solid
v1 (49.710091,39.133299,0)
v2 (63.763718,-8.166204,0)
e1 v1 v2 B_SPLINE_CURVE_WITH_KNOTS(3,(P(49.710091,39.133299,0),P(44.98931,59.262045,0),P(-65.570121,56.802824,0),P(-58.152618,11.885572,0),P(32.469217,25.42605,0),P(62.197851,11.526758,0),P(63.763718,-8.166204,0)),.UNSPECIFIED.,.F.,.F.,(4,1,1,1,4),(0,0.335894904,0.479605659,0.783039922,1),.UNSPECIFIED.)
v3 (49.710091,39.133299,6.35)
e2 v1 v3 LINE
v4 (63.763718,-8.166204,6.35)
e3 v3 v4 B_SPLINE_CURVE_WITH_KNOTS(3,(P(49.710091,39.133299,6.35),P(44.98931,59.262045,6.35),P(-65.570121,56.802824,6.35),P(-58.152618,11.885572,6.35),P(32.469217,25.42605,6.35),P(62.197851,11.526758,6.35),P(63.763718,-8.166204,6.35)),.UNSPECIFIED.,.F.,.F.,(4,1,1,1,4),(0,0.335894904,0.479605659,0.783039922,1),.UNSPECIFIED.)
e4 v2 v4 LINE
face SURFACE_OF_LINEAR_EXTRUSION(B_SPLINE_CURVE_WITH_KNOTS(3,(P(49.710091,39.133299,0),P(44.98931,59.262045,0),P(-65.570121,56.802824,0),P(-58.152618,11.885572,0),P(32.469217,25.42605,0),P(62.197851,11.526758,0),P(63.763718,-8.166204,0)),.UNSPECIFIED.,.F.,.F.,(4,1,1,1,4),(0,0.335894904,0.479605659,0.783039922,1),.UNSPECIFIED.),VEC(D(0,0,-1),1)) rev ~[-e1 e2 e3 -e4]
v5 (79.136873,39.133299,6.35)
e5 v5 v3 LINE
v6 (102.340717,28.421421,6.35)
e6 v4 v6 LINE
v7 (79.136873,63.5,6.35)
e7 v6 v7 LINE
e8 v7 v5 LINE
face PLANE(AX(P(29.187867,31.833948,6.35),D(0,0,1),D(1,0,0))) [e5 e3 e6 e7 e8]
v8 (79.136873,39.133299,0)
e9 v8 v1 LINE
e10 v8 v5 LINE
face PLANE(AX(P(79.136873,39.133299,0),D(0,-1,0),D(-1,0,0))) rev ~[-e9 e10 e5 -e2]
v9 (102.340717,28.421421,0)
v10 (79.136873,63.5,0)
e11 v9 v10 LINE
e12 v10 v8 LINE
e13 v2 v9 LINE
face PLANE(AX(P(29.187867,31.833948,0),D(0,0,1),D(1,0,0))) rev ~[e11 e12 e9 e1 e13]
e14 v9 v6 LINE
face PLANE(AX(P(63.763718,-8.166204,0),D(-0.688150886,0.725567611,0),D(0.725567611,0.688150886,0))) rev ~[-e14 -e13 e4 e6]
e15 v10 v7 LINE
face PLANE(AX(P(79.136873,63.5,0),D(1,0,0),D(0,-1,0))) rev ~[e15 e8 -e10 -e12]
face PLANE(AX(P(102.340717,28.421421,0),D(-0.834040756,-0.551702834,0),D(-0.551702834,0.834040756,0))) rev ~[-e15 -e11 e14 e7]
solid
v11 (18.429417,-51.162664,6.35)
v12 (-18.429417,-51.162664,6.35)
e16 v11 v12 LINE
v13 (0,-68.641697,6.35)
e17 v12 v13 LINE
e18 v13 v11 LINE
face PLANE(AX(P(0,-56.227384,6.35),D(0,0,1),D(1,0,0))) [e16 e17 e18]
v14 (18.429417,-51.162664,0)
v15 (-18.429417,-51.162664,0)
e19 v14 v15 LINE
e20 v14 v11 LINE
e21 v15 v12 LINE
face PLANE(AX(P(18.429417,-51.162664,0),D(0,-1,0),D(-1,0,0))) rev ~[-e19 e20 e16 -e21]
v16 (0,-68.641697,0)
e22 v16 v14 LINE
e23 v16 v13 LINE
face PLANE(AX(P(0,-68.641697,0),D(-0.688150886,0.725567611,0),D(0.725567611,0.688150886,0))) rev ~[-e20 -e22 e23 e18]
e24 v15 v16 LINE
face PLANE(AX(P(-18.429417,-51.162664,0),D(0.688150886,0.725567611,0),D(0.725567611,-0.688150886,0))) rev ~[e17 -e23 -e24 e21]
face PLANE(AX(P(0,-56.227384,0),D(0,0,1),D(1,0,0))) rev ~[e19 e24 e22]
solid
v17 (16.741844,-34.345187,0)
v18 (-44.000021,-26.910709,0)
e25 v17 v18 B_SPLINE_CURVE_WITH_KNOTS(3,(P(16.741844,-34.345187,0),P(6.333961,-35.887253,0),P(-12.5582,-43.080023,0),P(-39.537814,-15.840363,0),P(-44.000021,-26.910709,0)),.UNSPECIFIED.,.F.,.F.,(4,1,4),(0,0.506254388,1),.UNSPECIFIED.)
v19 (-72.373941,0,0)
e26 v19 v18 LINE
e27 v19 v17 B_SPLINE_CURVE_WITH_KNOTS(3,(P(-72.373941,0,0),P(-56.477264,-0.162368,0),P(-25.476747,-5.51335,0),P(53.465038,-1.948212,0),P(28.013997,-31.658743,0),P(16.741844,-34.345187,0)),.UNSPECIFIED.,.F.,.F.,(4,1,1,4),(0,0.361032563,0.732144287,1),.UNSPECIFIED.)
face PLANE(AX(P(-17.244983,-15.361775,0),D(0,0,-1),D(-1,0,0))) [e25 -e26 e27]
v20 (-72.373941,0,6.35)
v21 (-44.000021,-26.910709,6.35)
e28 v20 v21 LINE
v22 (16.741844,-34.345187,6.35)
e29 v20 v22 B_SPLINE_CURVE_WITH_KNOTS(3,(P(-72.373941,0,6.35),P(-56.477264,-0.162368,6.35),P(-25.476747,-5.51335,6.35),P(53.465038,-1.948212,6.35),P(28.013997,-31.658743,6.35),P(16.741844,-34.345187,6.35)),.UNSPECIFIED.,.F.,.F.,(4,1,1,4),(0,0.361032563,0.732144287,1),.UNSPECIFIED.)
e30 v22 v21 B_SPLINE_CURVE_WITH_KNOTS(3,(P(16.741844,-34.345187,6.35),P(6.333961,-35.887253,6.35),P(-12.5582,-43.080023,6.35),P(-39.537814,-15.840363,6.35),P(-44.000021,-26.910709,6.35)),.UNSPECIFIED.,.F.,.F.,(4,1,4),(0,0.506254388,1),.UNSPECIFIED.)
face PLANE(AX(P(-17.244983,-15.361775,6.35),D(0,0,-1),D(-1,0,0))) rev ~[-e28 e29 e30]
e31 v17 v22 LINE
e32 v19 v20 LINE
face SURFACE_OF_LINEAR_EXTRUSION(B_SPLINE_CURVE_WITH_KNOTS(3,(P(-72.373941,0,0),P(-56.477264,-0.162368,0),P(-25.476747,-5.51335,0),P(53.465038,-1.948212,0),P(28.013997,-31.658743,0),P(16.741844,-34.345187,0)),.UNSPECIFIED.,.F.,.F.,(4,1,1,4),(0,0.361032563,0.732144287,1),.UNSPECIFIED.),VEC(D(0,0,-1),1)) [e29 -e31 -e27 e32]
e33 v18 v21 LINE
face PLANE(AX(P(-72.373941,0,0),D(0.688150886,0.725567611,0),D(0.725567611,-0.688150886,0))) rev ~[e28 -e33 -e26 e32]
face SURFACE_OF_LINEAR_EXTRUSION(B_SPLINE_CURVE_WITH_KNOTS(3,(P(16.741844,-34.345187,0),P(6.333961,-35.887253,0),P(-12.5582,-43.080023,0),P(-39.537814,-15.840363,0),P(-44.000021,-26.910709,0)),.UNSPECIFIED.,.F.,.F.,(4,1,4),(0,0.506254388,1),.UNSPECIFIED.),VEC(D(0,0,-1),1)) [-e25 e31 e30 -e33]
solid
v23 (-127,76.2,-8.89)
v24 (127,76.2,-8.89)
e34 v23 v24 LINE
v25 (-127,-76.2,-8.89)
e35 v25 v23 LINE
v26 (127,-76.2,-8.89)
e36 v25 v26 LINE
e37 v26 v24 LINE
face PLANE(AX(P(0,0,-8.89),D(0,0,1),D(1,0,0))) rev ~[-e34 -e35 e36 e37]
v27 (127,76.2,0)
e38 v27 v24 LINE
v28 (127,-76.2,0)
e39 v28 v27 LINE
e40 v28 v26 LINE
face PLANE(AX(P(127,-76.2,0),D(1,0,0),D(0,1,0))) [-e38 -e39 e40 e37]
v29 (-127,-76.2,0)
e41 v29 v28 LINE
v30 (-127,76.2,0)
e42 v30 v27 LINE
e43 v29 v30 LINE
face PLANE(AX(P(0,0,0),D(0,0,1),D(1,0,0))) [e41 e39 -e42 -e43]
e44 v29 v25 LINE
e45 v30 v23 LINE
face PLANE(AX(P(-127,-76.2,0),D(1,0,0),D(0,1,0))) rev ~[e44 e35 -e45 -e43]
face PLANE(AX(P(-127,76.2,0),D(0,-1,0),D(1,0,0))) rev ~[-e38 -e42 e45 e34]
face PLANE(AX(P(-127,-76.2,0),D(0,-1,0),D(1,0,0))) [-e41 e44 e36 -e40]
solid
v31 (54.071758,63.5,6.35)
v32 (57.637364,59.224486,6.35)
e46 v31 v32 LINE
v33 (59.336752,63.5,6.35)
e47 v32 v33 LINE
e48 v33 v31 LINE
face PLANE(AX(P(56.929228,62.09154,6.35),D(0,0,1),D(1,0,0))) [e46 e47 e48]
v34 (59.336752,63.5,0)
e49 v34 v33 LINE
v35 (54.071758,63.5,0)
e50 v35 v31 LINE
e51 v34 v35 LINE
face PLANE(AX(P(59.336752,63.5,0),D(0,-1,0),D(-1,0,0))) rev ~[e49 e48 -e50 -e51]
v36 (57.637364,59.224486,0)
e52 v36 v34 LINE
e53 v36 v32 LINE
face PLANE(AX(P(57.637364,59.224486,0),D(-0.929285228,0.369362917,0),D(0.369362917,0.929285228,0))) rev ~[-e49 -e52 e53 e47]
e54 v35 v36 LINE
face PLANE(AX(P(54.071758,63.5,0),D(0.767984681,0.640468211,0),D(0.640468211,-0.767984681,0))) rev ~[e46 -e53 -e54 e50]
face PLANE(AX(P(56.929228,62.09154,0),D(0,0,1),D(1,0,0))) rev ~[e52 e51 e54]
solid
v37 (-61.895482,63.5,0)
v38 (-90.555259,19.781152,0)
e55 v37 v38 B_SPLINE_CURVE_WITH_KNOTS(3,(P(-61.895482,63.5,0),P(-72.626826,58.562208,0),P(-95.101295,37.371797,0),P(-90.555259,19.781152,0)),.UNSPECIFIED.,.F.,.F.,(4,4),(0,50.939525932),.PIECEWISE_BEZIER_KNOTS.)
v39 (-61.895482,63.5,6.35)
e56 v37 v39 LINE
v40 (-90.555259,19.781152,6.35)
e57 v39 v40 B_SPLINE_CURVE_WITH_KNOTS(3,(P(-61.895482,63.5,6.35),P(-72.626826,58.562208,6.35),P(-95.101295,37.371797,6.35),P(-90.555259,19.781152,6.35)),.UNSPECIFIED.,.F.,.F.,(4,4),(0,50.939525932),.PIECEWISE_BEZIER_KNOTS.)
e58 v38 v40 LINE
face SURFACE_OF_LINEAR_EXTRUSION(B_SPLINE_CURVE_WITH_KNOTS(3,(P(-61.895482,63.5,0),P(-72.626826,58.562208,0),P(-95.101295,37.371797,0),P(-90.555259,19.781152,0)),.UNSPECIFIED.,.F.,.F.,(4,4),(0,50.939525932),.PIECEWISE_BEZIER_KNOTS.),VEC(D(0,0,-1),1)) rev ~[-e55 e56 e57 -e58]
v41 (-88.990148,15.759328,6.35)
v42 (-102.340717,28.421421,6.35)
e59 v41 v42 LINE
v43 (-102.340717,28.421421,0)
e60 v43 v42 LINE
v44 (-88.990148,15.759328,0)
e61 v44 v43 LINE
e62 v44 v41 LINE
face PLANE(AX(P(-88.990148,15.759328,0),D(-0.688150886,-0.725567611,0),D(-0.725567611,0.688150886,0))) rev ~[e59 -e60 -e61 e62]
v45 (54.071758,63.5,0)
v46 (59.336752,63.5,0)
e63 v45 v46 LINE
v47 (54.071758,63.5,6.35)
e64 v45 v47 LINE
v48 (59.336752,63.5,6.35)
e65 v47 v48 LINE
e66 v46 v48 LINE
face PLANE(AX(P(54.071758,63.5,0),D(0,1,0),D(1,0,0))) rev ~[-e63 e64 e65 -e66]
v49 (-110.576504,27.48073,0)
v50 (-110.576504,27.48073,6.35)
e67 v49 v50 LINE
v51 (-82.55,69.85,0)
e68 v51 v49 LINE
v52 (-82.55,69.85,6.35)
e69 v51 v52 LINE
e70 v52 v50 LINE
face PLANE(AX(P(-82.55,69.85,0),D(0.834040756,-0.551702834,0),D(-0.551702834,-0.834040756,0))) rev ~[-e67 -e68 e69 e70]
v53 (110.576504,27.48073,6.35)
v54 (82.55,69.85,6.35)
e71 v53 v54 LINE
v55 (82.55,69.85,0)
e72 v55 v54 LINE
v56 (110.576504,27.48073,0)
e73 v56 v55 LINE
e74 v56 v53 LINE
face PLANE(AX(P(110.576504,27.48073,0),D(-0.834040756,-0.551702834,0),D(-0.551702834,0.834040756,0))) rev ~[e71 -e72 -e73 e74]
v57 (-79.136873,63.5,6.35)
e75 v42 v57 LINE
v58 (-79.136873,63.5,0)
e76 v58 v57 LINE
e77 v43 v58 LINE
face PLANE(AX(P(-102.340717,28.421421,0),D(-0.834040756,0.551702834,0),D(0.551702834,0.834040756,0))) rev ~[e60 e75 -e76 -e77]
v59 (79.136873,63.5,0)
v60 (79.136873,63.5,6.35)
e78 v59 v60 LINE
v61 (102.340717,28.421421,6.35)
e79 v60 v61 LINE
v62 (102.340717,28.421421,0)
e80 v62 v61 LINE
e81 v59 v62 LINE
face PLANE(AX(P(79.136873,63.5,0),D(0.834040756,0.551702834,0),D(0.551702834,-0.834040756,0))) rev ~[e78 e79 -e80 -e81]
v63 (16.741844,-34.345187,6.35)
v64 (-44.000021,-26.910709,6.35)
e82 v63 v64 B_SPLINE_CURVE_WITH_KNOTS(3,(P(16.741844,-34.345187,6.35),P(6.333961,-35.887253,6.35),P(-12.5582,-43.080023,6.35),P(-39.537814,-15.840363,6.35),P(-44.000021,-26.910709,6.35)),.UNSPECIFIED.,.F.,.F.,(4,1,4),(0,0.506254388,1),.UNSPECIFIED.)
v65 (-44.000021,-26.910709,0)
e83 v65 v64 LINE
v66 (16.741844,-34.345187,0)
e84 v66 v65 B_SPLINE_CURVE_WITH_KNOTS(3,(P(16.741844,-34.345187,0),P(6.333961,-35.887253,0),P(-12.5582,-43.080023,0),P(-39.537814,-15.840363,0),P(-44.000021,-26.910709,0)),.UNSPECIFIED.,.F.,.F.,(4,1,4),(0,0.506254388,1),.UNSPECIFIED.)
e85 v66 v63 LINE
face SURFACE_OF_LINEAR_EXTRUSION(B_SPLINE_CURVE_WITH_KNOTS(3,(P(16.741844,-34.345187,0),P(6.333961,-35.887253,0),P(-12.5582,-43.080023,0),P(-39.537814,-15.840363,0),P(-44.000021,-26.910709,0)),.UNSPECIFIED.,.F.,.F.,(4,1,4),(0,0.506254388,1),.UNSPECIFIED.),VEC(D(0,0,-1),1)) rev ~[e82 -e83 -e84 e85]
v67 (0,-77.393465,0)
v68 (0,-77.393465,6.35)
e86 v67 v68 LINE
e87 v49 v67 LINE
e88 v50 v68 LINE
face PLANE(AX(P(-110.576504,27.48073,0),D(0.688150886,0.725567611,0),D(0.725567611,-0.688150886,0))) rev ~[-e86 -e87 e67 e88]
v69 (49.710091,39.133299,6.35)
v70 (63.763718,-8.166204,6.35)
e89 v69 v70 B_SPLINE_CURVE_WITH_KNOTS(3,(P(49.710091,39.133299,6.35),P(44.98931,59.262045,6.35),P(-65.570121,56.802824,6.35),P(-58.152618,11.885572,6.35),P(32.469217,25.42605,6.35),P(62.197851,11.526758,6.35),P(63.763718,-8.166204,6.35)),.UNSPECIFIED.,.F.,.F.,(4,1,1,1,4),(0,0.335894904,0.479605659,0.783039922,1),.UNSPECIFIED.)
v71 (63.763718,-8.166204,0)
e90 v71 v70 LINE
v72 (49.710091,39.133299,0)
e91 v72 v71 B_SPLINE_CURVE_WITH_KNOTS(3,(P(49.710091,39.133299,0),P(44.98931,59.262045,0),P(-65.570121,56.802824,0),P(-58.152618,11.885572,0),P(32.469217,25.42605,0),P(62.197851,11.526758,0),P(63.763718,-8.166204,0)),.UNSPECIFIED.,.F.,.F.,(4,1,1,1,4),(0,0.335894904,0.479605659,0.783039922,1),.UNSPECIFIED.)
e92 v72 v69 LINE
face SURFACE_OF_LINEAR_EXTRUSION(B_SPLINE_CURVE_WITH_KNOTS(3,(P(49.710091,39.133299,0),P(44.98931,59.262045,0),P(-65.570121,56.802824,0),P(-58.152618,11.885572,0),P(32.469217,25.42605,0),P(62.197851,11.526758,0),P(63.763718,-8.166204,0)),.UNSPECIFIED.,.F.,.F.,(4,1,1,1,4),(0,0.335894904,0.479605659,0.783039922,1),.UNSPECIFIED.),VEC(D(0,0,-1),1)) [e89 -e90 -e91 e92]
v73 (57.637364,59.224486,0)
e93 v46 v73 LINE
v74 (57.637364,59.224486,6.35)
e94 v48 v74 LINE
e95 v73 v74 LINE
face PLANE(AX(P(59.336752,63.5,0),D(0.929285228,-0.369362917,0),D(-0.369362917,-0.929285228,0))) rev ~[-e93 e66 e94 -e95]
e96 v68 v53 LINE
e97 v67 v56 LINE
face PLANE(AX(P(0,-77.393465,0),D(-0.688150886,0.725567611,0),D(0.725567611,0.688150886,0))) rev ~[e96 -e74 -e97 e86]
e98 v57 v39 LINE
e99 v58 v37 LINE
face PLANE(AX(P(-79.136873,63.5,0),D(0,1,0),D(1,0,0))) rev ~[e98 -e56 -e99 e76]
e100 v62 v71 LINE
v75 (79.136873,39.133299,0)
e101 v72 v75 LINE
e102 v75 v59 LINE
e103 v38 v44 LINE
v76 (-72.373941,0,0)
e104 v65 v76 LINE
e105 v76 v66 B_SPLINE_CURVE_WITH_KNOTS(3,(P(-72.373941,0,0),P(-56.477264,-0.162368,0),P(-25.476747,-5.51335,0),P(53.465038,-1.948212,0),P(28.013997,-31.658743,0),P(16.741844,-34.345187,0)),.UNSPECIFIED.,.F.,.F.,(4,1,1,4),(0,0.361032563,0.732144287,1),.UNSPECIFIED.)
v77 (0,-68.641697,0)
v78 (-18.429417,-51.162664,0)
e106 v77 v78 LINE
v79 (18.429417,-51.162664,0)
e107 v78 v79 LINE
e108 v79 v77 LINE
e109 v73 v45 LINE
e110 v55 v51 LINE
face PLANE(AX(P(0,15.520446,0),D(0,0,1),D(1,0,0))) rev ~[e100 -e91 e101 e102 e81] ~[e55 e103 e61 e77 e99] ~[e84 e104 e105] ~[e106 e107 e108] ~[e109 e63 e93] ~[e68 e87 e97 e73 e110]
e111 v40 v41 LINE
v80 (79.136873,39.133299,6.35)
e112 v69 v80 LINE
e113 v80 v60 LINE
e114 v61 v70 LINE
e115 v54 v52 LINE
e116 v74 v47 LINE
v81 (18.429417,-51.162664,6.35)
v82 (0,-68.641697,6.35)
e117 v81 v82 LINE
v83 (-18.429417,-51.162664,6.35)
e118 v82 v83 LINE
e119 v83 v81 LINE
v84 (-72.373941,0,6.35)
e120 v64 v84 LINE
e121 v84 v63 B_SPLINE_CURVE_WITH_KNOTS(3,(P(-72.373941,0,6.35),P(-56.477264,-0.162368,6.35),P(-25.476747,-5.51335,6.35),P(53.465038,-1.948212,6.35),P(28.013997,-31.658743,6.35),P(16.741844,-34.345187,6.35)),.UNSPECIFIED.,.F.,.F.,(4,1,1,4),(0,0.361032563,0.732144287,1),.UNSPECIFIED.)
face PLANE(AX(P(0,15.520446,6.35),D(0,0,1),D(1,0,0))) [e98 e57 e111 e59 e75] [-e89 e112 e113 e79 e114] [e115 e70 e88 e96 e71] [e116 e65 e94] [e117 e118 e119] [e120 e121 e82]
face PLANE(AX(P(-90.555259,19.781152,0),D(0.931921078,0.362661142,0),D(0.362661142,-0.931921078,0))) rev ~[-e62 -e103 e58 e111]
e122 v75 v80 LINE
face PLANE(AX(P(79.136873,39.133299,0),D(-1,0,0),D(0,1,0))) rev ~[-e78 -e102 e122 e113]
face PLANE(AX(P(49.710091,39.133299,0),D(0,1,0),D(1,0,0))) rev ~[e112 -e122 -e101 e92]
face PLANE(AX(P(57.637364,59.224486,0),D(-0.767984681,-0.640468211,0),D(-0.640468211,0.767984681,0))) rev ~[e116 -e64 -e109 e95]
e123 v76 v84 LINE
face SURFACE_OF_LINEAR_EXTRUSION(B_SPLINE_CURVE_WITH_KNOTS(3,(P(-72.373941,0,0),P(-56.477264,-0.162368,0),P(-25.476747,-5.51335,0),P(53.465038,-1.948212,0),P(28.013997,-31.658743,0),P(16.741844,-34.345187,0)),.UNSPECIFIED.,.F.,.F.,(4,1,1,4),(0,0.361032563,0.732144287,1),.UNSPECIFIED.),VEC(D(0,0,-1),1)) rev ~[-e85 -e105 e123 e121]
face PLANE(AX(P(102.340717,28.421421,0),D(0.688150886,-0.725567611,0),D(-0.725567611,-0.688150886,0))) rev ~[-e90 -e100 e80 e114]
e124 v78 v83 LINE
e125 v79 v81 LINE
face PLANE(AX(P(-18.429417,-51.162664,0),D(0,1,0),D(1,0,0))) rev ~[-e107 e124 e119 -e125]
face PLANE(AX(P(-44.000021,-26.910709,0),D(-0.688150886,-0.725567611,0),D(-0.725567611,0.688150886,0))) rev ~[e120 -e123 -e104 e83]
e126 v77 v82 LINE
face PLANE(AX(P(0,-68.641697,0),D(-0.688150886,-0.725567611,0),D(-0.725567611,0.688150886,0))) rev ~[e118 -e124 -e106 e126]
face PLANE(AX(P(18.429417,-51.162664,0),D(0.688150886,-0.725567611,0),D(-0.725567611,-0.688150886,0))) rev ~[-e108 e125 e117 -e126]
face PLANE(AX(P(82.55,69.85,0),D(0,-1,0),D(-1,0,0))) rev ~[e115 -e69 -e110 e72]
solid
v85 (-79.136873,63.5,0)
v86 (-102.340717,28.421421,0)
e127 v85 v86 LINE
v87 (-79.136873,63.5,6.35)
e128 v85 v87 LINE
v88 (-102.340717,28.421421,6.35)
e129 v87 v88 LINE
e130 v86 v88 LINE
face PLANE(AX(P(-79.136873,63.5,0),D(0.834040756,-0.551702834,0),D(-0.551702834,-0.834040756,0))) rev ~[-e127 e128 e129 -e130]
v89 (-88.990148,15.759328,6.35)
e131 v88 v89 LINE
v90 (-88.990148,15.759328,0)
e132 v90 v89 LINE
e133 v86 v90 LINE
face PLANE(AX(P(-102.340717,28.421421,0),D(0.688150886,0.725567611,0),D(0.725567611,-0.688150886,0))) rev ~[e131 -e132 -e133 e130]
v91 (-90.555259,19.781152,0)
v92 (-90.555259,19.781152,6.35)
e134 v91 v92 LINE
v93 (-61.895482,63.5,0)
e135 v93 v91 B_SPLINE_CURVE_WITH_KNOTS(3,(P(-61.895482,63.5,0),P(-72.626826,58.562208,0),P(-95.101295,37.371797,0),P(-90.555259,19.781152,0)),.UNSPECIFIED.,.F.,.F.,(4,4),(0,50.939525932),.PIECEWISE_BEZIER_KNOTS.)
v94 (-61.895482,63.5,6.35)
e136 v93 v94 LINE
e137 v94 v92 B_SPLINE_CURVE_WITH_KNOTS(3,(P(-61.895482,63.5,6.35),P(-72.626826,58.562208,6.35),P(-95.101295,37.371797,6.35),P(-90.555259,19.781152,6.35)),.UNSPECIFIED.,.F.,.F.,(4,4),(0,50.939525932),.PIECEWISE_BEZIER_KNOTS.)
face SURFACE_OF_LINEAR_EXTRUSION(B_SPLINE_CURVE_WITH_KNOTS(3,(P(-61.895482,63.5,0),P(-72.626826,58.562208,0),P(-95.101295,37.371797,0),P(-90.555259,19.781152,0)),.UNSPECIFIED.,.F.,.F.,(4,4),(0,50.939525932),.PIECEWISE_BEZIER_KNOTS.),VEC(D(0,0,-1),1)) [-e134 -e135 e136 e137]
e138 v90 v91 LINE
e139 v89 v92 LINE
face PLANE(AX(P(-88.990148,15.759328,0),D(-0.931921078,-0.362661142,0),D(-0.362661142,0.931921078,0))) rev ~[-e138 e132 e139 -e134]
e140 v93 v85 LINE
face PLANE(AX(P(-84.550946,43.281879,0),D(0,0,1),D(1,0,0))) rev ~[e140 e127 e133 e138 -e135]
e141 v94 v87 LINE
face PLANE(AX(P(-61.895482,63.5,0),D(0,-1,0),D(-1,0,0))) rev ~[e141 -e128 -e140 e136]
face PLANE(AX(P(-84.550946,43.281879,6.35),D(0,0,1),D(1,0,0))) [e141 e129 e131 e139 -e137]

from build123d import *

# Parameters (mm, degrees)
F0_W     = 254
F0_H     = 152.4
F1_DEPTH = 8.89
F3_DEPTH = 6.35
F4_DEPTH = 6.35


with BuildPart() as f1:
    # F0 (on Top) → F1 (new body)
    with BuildSketch(Plane.XY):
        Rectangle(F0_W, F0_H)
    extrude(amount=-F1_DEPTH)


with BuildPart() as f3:
    # F2 (on face) → F3 (new body)
    with BuildSketch(Plane.XY):
        Polygon((-110.5765039644, 27.4807295846), (0, -77.3934653874), (110.5765039644, 27.4807295846), (82.55, 69.85), (0, 69.85), (-82.55, 69.85), align=None)
        Polygon((0, -68.6416965639), (-18.4294173274, -51.1626640686), (18.4294173274, -51.1626640686), align=None, mode=Mode.SUBTRACT)
        with BuildLine():
            Line((-44.0000207675, -26.9107085936), (-72.3739413137, 0))
            add(Edge.make_bspline(
                [(-72.3739413137, 0), (-56.4772636932, -0.1623677252), (-25.4767474165, -5.51335001), (53.4650384253, -1.948212177), (28.0139967905, -31.6587429979), (16.7418438941, -34.3451872468)],
                knots=[0, 0, 0, 0, 0.3610325629, 0.7321442872, 1, 1, 1, 1], degree=3))
            add(Edge.make_bspline(
                [(16.7418438941, -34.3451872468), (6.3339606859, -35.8872525394), (-12.5582004687, -43.0800227139), (-39.5378135145, -15.8403627574), (-44.0000207675, -26.9107085936)],
                knots=[0, 0, 0, 0, 0.5062543881, 1, 1, 1, 1], degree=3))
        make_face(mode=Mode.SUBTRACT)
        with BuildLine():
            Line((-102.34071652, 28.4214214864), (-79.1368730236, 63.5))
            Line((-79.1368730236, 63.5), (-61.8954822743, 63.5))
            add(Edge.make_bspline(
                [(-61.8954822743, 63.5), (-72.6268264588, 58.5622080867), (-95.101295313, 37.3717973696), (-90.5552589798, 19.7811521388)],
                knots=[0, 0, 0, 0, 50.9395259322, 50.9395259322, 50.9395259322, 50.9395259322], degree=3))
            Line((-90.5552589798, 19.7811521388), (-88.9901484483, 15.7593275628))
            Line((-88.9901484483, 15.7593275628), (-102.34071652, 28.4214214864))
        make_face(mode=Mode.SUBTRACT)
        with BuildLine():
            Line((102.34071652, 28.4214214864), (63.7637178758, -8.1662036618))
            add(Edge.make_bspline(
                [(49.7100912035, 39.1332991421), (44.9893101786, 59.2620450287), (-65.5701214452, 56.8028238808), (-58.1526178236, 11.8855718778), (32.4692170914, 25.4260499791), (62.1978511511, 11.5267576353), (63.7637178758, -8.1662036618)],
                knots=[0, 0, 0, 0, 0.3358949045, 0.4796056591, 0.7830399215, 1, 1, 1, 1], degree=3))
            Line((49.7100912035, 39.1332991421), (79.1368730236, 39.1332991421))
            Line((79.1368730236, 39.1332991421), (79.1368730236, 63.5))
            Line((79.1368730236, 63.5), (102.34071652, 28.4214214864))
        make_face(mode=Mode.SUBTRACT)
        Polygon((54.0717579424, 63.5), (59.3367516994, 63.5), (57.6373636723, 59.224486351), align=None, mode=Mode.SUBTRACT)
    extrude(amount=F3_DEPTH)


with BuildPart() as f4:
    # F2 (on face) → F4 (new body, through all)
    with BuildSketch(Plane.XY):
        Polygon((57.6373636723, 59.224486351), (59.3367516994, 63.5), (54.0717579424, 63.5), align=None)
    extrude(amount=F4_DEPTH)


with BuildPart() as f4b:
    # F2 (on face) → F4, piece 2 (new body, through all)
    with BuildSketch(Plane.XY):
        with BuildLine():
            add(Edge.make_bspline(
                [(49.7100912035, 39.1332991421), (44.9893101786, 59.2620450287), (-65.5701214452, 56.8028238808), (-58.1526178236, 11.8855718778), (32.4692170914, 25.4260499791), (62.1978511511, 11.5267576353), (63.7637178758, -8.1662036618)],
                knots=[0, 0, 0, 0, 0.3358949045, 0.4796056591, 0.7830399215, 1, 1, 1, 1], degree=3))
            Line((63.7637178758, -8.1662036618), (102.34071652, 28.4214214864))
            Line((102.34071652, 28.4214214864), (79.1368730236, 63.5))
            Line((79.1368730236, 63.5), (79.1368730236, 39.1332991421))
            Line((79.1368730236, 39.1332991421), (49.7100912035, 39.1332991421))
        make_face()
    extrude(amount=F4_DEPTH)


with BuildPart() as f4c:
    # F2 (on face) → F4, piece 3 (new body, through all)
    with BuildSketch(Plane.XY):
        Polygon((18.4294173274, -51.1626640686), (-18.4294173274, -51.1626640686), (0, -68.6416965639), align=None)
    extrude(amount=F4_DEPTH)


with BuildPart() as f4d:
    # F2 (on face) → F4, piece 4 (new body, through all)
    with BuildSketch(Plane.XY):
        with BuildLine():
            add(Edge.make_bspline(
                [(-72.3739413137, 0), (-56.4772636932, -0.1623677252), (-25.4767474165, -5.51335001), (53.4650384253, -1.948212177), (28.0139967905, -31.6587429979), (16.7418438941, -34.3451872468)],
                knots=[0, 0, 0, 0, 0.3610325629, 0.7321442872, 1, 1, 1, 1], degree=3))
            Line((-72.3739413137, 0), (-44.0000207675, -26.9107085936))
            add(Edge.make_bspline(
                [(16.7418438941, -34.3451872468), (6.3339606859, -35.8872525394), (-12.5582004687, -43.0800227139), (-39.5378135145, -15.8403627574), (-44.0000207675, -26.9107085936)],
                knots=[0, 0, 0, 0, 0.5062543881, 1, 1, 1, 1], degree=3))
        make_face()
    extrude(amount=F4_DEPTH)


with BuildPart() as f4e:
    # F2 (on face) → F4, piece 5 (new body, through all)
    with BuildSketch(Plane.XY):
        with BuildLine():
            Line((-61.8954822743, 63.5), (-79.1368730236, 63.5))
            Line((-79.1368730236, 63.5), (-102.34071652, 28.4214214864))
            Line((-102.34071652, 28.4214214864), (-88.9901484483, 15.7593275628))
            add(Edge.make_bspline(
                [(-90.5552589798, 19.7811521388), (-90.2023942784, 18.4157609891), (-89.6867334414, 17.0720581056), (-88.9901484483, 15.7593275628)],
                knots=[50.9395259322, 50.9395259322, 50.9395259322, 50.9395259322, 54.8934671872, 54.8934671872, 54.8934671872, 54.8934671872], degree=3))
            add(Edge.make_bspline(
                [(-61.8954822743, 63.5), (-72.6268264588, 58.5622080867), (-95.101295313, 37.3717973696), (-90.5552589798, 19.7811521388)],
                knots=[0, 0, 0, 0, 50.9395259322, 50.9395259322, 50.9395259322, 50.9395259322], degree=3))
        make_face()
        with BuildLine():
            Line((-88.9901484483, 15.7593275628), (-90.5552589798, 19.7811521388))
            add(Edge.make_bspline(
                [(-90.5552589798, 19.7811521388), (-90.2023942784, 18.4157609891), (-89.6867334414, 17.0720581056), (-88.9901484483, 15.7593275628)],
                knots=[50.9395259322, 50.9395259322, 50.9395259322, 50.9395259322, 54.8934671872, 54.8934671872, 54.8934671872, 54.8934671872], degree=3))
        make_face()
    extrude(amount=F4_DEPTH)


solid = Compound([f1.part, f3.part, f4.part, f4b.part, f4c.part, f4d.part, f4e.part])
